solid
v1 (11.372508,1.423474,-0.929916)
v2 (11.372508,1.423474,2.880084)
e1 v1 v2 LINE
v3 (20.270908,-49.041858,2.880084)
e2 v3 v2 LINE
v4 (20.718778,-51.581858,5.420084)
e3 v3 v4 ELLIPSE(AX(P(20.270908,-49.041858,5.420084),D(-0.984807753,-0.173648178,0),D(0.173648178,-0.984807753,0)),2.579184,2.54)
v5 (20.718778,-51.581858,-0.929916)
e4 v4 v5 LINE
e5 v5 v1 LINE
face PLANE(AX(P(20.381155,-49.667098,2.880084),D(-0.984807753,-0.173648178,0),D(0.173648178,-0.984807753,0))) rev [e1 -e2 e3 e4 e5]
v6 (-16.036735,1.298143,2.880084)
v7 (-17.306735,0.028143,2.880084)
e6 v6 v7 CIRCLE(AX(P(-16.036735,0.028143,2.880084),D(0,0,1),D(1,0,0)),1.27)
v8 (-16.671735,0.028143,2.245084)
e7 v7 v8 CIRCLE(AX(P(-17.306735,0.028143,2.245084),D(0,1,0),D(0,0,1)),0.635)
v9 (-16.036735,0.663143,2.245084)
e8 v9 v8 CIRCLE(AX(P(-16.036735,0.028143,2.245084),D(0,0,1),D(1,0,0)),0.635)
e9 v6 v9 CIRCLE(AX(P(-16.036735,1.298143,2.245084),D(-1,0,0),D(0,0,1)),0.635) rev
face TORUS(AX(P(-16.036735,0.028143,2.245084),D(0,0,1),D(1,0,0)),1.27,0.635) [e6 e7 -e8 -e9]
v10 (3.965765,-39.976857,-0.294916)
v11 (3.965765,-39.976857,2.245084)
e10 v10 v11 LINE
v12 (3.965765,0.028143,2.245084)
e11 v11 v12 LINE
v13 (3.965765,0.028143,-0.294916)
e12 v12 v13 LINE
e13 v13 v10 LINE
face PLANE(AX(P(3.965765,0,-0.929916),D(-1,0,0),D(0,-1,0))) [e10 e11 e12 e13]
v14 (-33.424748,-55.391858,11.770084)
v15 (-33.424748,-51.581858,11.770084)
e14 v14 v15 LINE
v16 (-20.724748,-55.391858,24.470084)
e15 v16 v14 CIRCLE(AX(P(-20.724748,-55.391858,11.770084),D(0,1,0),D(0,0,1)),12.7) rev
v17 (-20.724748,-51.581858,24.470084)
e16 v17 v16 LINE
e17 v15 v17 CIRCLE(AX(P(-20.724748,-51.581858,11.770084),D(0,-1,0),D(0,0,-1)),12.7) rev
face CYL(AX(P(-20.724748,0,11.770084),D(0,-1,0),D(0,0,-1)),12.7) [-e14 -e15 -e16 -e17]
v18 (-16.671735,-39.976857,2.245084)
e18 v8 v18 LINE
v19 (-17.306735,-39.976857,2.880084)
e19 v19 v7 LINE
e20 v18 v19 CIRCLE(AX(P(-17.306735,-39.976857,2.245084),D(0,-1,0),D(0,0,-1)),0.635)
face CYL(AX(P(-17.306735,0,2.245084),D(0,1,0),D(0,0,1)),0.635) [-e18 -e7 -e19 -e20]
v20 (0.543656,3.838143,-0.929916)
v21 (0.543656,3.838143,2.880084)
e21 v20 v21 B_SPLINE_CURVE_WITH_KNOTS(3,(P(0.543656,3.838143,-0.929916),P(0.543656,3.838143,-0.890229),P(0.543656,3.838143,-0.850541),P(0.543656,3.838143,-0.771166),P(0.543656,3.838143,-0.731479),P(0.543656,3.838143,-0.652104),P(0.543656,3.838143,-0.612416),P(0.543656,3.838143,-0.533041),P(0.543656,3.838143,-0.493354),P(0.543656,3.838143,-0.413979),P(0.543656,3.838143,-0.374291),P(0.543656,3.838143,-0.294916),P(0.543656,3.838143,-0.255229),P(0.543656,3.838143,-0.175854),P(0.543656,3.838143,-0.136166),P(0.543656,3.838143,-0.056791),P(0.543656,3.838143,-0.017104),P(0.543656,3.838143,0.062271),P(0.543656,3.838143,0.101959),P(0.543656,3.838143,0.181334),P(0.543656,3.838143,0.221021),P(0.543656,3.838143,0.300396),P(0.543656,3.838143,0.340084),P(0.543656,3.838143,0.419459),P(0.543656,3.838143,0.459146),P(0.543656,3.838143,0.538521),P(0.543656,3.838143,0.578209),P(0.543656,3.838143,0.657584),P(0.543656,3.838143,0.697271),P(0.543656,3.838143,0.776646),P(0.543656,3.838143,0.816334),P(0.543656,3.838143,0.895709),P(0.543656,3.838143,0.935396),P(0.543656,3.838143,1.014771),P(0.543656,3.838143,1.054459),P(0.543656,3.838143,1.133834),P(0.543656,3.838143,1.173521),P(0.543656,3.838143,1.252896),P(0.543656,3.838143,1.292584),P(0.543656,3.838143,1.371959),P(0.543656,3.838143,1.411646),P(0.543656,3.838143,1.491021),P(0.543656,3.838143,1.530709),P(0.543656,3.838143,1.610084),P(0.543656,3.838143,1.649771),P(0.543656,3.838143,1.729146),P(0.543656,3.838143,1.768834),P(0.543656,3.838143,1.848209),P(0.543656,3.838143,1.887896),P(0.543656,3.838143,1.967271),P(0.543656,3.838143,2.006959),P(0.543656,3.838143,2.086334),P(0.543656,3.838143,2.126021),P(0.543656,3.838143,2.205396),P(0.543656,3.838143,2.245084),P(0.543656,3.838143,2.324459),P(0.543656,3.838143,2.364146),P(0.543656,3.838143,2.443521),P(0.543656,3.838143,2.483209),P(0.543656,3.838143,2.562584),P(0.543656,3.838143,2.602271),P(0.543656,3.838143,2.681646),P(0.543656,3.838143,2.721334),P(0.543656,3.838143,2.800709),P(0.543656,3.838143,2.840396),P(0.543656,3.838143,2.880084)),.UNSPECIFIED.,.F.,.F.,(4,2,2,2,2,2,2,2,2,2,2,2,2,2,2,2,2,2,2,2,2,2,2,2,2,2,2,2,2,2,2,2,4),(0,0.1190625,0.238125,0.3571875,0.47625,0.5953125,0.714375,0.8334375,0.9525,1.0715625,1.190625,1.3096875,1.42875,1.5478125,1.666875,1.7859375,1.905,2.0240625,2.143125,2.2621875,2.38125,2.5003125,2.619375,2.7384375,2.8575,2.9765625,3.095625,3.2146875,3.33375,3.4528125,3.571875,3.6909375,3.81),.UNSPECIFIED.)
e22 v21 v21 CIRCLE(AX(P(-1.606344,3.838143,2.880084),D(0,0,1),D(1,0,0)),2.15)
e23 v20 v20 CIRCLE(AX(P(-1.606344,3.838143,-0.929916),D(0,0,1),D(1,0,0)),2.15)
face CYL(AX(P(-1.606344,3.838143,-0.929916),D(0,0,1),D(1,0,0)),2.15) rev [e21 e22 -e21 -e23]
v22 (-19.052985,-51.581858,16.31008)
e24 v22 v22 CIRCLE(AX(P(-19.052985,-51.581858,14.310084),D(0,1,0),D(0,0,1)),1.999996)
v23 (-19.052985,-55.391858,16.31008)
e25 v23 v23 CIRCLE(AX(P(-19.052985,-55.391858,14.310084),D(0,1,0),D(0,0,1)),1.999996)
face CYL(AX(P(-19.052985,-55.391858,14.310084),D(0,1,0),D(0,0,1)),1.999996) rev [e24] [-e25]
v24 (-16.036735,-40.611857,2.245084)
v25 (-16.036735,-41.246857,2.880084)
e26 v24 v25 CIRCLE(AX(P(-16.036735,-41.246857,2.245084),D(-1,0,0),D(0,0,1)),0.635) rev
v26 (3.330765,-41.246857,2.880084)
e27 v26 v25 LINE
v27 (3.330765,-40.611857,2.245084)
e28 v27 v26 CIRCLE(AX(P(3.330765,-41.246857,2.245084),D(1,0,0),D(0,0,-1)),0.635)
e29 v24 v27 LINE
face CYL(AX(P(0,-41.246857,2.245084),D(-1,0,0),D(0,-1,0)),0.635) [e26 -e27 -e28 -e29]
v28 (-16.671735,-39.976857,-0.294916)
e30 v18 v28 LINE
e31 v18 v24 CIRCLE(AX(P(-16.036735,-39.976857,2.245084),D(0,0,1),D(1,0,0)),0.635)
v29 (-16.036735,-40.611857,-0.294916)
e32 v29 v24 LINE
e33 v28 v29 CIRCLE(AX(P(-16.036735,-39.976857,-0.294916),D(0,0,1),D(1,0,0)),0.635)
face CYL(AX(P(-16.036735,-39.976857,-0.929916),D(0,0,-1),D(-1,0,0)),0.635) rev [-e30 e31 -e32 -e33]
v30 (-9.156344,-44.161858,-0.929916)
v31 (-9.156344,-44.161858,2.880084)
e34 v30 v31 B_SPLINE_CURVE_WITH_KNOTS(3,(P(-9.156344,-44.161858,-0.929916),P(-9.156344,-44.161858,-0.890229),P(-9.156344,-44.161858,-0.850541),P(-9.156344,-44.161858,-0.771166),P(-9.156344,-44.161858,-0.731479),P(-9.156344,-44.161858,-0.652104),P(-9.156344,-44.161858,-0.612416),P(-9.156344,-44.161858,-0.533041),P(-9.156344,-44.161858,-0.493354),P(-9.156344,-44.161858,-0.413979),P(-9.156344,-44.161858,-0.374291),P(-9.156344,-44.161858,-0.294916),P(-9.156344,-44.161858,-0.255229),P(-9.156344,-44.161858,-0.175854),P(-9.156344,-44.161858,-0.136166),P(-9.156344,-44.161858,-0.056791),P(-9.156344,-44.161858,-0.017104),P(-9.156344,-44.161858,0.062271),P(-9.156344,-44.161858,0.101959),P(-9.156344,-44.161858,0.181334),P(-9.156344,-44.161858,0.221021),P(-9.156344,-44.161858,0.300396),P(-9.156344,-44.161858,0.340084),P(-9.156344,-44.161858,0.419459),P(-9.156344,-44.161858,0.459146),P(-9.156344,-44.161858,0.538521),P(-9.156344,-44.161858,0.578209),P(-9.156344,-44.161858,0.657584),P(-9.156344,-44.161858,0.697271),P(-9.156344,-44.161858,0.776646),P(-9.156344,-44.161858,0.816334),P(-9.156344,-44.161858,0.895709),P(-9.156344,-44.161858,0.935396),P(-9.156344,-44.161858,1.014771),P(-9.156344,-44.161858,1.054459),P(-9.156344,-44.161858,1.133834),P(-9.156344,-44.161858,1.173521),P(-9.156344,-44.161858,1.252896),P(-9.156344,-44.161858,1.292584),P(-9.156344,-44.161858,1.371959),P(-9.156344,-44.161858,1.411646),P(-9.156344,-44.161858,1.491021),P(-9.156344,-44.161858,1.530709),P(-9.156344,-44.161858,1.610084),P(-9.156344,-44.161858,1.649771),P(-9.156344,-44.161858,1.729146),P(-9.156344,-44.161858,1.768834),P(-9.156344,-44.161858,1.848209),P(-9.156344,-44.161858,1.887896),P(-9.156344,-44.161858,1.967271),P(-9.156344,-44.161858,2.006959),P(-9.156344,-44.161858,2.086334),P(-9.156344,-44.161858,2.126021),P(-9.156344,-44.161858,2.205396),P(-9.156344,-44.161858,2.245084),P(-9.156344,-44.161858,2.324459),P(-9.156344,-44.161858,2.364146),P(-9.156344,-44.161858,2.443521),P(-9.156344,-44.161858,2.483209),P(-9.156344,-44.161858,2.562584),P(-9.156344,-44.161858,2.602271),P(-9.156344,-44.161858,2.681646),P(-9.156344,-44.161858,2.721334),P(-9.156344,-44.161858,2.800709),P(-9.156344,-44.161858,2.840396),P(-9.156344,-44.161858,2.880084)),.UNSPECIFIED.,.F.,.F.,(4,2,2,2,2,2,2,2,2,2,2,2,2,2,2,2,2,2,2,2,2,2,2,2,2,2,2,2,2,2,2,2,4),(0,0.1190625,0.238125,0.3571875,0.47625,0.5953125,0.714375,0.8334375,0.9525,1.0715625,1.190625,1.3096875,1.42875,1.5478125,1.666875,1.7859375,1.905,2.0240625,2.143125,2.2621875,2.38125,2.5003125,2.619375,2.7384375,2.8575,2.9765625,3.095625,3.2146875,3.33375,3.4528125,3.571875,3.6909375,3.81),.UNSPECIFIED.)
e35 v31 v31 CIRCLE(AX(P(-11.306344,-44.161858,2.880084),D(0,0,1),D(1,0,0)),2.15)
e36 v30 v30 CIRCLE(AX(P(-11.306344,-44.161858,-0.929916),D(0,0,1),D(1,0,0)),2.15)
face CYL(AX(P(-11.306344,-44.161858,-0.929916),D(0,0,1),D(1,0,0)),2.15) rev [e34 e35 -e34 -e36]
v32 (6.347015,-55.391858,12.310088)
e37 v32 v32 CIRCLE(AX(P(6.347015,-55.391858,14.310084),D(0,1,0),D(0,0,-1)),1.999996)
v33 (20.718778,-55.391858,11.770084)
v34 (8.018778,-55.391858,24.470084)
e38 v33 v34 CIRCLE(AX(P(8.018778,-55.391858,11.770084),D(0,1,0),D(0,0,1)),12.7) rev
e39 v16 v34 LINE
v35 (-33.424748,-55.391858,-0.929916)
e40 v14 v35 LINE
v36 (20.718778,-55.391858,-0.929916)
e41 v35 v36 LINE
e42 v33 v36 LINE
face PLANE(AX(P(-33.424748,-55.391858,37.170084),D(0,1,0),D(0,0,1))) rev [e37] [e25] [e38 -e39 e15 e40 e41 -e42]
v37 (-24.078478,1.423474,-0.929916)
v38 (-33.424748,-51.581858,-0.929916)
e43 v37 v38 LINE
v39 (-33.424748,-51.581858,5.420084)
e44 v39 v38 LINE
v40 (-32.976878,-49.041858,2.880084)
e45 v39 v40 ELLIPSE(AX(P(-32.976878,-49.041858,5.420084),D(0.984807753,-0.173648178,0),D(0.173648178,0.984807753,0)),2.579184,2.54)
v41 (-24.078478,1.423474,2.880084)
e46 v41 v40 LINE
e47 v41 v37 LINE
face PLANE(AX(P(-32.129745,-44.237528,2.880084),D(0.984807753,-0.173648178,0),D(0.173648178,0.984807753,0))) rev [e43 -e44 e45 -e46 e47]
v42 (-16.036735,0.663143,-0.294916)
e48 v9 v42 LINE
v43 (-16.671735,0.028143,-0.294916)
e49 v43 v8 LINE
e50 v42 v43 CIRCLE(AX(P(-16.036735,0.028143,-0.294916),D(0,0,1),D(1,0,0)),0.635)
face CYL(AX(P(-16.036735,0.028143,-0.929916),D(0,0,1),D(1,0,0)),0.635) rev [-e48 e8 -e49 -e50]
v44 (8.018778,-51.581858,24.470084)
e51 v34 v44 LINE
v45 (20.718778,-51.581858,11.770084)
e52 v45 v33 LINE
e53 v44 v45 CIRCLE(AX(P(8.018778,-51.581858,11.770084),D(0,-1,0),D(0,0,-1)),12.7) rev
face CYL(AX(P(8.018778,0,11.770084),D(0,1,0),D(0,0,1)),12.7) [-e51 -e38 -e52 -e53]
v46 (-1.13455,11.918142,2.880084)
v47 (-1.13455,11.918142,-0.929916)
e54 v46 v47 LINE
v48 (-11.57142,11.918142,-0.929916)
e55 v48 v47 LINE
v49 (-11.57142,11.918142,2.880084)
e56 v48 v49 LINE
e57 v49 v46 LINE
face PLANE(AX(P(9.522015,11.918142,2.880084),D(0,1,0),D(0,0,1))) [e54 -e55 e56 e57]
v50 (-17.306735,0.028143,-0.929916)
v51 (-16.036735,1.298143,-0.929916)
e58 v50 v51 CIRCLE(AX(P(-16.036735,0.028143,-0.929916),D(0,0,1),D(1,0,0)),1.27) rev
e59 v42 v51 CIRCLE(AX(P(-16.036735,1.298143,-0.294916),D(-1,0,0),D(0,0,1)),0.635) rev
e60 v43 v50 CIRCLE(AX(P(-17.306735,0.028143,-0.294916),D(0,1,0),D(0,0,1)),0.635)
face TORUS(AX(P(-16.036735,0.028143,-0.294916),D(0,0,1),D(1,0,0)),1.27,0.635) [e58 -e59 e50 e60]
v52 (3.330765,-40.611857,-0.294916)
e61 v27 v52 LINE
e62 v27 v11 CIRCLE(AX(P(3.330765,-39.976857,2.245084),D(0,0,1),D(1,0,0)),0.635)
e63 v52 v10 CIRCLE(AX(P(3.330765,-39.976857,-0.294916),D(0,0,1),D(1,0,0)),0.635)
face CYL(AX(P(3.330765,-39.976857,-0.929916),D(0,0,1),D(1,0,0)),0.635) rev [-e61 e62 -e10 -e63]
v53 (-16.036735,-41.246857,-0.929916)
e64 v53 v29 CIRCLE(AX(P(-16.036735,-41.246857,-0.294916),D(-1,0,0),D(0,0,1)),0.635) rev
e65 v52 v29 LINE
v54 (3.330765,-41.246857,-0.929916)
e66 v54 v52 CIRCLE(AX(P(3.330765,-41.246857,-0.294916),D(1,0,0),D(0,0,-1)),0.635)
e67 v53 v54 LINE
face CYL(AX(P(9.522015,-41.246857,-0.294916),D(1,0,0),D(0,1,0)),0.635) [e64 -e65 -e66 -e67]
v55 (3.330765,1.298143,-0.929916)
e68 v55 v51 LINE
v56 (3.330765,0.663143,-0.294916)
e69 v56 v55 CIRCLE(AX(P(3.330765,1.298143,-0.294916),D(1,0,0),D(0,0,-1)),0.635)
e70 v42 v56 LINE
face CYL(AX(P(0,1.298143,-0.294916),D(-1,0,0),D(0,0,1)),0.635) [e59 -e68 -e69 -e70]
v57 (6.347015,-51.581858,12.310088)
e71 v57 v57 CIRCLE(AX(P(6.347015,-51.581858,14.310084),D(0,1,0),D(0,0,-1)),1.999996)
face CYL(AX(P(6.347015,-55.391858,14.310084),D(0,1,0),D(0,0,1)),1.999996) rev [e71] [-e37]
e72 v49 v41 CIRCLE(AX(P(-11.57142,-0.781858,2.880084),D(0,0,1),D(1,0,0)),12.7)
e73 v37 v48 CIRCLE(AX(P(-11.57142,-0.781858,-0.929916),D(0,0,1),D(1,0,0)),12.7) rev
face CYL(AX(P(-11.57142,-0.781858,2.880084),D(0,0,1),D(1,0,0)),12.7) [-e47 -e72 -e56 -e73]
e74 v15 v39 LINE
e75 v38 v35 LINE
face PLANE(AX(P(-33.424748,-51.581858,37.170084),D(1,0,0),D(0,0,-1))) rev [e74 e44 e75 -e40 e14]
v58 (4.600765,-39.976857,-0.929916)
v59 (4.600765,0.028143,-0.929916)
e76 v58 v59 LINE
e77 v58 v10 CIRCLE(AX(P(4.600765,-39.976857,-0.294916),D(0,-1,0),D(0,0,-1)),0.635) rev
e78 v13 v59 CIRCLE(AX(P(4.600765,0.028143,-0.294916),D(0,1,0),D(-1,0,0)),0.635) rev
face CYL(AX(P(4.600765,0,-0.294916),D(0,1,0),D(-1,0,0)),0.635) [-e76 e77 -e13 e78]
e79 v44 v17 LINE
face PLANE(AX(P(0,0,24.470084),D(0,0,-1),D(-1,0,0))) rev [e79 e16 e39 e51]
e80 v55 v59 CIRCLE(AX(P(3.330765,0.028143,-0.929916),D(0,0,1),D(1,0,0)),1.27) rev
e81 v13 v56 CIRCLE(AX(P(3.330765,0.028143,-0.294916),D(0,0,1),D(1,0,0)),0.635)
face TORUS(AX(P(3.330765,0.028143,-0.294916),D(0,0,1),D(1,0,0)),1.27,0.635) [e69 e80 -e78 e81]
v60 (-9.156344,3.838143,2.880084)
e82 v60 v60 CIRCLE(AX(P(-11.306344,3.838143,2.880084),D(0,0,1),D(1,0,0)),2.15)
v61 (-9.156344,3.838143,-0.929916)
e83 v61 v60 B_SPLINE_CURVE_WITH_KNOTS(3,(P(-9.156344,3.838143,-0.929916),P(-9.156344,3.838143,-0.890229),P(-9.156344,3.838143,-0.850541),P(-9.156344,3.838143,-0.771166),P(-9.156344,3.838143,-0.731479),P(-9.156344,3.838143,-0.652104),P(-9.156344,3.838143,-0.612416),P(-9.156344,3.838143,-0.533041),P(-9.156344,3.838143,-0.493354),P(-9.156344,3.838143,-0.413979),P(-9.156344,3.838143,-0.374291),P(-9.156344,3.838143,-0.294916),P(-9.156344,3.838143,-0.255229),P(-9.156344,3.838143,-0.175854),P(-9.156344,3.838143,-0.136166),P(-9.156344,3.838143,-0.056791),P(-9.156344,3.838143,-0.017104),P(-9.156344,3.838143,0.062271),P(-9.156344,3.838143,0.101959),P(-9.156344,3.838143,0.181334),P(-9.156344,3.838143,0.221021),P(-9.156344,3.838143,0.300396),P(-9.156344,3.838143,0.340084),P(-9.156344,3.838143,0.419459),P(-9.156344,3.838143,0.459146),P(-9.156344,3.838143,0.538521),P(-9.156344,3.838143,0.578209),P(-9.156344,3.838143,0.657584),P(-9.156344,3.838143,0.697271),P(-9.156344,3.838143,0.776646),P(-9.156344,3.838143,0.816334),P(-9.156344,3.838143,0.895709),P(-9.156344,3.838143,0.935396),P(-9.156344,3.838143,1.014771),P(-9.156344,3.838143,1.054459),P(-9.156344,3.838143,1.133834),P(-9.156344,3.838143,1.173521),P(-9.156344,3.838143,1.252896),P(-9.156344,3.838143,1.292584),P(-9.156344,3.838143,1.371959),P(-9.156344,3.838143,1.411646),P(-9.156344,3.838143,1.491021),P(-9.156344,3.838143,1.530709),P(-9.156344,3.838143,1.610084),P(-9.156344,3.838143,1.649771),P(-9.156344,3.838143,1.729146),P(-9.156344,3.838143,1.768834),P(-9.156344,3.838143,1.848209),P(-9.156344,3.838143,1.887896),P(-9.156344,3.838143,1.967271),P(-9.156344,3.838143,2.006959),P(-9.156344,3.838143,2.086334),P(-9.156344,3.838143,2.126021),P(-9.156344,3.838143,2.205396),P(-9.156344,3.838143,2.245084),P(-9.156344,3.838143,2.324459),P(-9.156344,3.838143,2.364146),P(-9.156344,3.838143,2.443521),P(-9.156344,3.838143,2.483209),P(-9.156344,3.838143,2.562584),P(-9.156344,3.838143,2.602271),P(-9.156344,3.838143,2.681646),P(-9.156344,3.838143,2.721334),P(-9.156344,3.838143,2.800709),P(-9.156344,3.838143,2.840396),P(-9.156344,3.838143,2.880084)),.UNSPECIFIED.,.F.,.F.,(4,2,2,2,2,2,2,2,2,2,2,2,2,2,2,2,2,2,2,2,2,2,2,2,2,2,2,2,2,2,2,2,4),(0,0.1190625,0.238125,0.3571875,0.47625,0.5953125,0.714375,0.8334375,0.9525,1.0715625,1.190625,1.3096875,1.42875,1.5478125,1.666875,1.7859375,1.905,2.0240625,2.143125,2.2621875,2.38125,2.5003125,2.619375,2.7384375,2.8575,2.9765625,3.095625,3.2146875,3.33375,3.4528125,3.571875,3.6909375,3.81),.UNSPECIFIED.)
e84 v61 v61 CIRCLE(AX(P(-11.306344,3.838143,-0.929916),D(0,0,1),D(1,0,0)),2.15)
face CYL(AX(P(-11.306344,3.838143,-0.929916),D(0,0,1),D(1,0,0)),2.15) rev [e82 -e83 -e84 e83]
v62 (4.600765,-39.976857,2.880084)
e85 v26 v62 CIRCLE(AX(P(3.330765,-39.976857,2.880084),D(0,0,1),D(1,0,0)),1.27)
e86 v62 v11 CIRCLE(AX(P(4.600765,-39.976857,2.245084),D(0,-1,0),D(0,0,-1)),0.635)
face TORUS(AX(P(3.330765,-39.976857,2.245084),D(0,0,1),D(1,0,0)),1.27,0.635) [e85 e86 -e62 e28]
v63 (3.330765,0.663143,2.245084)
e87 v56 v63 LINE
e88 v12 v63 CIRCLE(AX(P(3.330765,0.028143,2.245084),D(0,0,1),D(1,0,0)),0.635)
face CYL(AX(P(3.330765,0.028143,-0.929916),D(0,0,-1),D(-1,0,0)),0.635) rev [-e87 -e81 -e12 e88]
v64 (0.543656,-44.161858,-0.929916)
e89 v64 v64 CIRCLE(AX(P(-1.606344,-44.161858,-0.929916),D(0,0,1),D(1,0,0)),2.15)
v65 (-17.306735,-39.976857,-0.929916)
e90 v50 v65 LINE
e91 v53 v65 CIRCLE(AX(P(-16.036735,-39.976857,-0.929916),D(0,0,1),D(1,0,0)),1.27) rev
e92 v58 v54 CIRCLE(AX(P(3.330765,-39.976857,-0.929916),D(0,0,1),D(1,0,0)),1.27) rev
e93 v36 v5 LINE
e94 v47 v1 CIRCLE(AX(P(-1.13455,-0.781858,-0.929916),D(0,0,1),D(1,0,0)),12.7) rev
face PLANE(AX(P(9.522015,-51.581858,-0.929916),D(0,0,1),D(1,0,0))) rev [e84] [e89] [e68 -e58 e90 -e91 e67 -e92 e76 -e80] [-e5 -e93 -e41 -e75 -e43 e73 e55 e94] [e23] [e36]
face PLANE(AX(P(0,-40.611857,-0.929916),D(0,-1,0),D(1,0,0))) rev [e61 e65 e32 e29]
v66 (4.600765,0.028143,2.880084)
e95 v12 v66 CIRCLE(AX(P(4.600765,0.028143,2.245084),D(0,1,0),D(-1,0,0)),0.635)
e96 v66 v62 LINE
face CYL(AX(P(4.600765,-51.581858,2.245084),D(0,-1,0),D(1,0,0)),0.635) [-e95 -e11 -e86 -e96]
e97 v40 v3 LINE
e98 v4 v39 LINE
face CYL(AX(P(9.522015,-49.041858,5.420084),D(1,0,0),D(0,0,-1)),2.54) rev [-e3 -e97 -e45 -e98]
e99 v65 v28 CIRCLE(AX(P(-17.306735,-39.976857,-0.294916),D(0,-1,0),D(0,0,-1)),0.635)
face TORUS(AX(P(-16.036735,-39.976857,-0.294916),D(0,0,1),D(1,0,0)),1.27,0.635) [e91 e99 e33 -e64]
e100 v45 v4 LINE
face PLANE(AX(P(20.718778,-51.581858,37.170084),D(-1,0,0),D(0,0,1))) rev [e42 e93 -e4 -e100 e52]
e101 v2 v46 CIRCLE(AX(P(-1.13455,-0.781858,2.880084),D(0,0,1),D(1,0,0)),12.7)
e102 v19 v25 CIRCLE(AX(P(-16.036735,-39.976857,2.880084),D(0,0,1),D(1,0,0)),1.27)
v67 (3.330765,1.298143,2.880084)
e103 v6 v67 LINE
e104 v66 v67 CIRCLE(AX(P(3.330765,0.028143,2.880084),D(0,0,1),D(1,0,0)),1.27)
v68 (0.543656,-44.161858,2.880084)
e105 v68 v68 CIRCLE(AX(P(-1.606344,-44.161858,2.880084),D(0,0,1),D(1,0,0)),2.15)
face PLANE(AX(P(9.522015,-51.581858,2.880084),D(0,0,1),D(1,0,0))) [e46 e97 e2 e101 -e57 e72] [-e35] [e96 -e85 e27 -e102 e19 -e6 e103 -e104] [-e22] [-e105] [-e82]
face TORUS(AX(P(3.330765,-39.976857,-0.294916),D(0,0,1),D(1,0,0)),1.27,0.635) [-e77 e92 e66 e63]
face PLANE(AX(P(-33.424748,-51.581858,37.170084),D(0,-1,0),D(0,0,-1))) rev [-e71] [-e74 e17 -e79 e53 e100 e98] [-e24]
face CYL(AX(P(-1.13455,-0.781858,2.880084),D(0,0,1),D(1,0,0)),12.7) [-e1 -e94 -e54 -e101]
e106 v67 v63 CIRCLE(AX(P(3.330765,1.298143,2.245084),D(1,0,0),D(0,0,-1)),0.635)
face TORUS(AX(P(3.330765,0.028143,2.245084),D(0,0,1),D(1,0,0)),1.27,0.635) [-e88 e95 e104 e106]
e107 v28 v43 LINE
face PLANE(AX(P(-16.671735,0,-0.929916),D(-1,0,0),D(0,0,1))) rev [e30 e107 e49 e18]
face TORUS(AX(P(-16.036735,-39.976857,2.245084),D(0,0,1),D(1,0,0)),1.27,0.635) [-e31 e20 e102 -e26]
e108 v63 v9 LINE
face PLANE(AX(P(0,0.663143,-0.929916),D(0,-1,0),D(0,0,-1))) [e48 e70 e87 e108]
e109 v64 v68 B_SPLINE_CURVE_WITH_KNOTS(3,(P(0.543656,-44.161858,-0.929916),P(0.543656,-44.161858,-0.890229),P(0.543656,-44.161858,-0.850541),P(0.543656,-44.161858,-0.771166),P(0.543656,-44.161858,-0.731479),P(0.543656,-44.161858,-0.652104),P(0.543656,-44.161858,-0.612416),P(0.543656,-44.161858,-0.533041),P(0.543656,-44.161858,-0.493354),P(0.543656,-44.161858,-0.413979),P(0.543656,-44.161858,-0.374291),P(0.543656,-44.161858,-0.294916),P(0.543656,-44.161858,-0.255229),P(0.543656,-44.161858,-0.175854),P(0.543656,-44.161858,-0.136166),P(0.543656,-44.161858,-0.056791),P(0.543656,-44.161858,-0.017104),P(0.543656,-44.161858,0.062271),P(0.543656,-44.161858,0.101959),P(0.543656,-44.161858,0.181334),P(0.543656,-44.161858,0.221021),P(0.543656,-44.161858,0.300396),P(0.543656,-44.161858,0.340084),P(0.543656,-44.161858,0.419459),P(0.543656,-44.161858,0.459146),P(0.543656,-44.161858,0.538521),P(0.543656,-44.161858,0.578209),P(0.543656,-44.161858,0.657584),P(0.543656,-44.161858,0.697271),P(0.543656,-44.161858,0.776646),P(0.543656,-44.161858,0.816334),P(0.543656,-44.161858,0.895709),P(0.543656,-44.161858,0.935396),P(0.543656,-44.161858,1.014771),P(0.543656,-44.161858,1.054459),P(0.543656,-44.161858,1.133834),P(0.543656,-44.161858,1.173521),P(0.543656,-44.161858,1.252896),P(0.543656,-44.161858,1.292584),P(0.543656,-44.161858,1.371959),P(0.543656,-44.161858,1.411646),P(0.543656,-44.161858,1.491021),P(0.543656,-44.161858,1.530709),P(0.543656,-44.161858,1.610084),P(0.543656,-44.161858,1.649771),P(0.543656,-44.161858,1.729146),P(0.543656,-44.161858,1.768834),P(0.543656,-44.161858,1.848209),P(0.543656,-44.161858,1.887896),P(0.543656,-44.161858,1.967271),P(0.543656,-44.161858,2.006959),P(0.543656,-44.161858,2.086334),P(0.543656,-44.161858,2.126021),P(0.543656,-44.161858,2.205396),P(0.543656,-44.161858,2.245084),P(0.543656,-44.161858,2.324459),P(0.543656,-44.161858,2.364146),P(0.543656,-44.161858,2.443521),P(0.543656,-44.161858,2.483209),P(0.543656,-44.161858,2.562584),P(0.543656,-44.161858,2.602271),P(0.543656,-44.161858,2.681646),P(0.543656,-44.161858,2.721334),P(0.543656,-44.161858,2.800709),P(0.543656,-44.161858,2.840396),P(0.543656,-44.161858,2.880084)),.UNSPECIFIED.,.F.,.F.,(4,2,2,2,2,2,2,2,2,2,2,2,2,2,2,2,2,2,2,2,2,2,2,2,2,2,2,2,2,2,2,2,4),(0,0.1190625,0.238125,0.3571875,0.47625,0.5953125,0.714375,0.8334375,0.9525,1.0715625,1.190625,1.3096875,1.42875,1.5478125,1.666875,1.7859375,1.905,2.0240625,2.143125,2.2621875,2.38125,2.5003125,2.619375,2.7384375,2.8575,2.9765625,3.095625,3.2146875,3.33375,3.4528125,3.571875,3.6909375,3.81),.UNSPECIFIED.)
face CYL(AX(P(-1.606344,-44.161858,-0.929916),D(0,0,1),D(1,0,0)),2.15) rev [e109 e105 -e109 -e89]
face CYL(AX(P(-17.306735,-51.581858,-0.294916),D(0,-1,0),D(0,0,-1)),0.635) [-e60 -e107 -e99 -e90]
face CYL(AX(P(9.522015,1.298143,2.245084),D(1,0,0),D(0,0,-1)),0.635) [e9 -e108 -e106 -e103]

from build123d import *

# Parameters (mm, degrees)
FILLET2_START       = -0.929916211
FILLET2_OUTLINE_R   = 2.15
FILLET2_DEPTH       = 3.81
FILLET2_START_2     = 2.880083789
FILLET2_2_OUTLINE_W = 54.14352655
FILLET2_2_OUTLINE_H = 3.81
FILLET2_2_DEPTH     = 34.29
FILLET6_R           = 2.54
SKETCH6_W           = 54.14352655
SKETCH6_H           = 3.81
CUT_EXTRUDE2_DEPTH  = 12.7
FILLET8_R           = 12.7
SKETCH7_R           = 1.999996
CUT_EXTRUDE3_DEPTH  = 76.817206459
SKETCH8_W           = 20.6375
SKETCH8_H           = 41.275
CUT_EXTRUDE5_DEPTH  = 69.202637613
FILLET10_R          = 0.635


with BuildPart() as part:
    # Fillet2: read off the stored shape, not the designer's step
    # Fillet2 outline → Fillet2 (new body)
    with BuildSketch(Plane.XY.offset(FILLET2_START)):
        with BuildLine():
            Line((20.718778313, -51.581857548), (11.372508186, 1.423474309))
            ThreePointArc((11.372508186, 1.423474309), (7.028852365, 8.94690688), (-1.134550278, 11.918142452))
            Line((-1.134550278, 11.918142452), (-11.571419646, 11.918142452))
            ThreePointArc((-11.571419646, 11.918142452), (-19.734822289, 8.94690688), (-24.078478109, 1.423474309))
            Line((-24.078478109, 1.423474309), (-33.424748237, -51.581857548))
            Line((-33.424748237, -51.581857548), (-33.424748237, -55.391857548))
            Line((-33.424748237, -55.391857548), (20.718778313, -55.391857548))
            Line((20.718778313, -55.391857548), (20.718778313, -51.581857548))
        make_face()
        with Locations((-11.306344138, -44.161858203)):
            Circle(FILLET2_OUTLINE_R, mode=Mode.SUBTRACT)
        with Locations((-1.606344138, -44.161858203)):
            Circle(FILLET2_OUTLINE_R, mode=Mode.SUBTRACT)
        with Locations((-11.306344138, 3.838143108)):
            Circle(FILLET2_OUTLINE_R, mode=Mode.SUBTRACT)
        with Locations((-1.606344138, 3.838143108)):
            Circle(FILLET2_OUTLINE_R, mode=Mode.SUBTRACT)
    extrude(amount=FILLET2_DEPTH)

    # Fillet2 2 outline → Fillet2 2 (add)
    with BuildSketch(Plane.XY.offset(FILLET2_START_2)):
        with Locations((-6.352984962, -53.486857548)):
            Rectangle(FILLET2_2_OUTLINE_W, FILLET2_2_OUTLINE_H)
    extrude(amount=FILLET2_2_DEPTH)

    # Fillet6
    fillet6_edges = [part.edges().sort_by_distance(p)[0] for p in [
        (-6.352984962, -51.581857548, 2.880083789),
    ]]
    fillet(fillet6_edges, radius=FILLET6_R)

    # Sketch6 → Cut-Extrude2 (cut)
    with BuildSketch(Plane.XY.offset(37.170083789)):
        with Locations((-6.352984962, -53.486857548)):
            Rectangle(SKETCH6_W, SKETCH6_H)
    extrude(amount=-CUT_EXTRUDE2_DEPTH, mode=Mode.SUBTRACT)

    # Fillet8
    fillet8_edges = [part.edges().sort_by_distance(p)[0] for p in [
        (-33.424748237, -53.486857548, 24.470083789),
        (20.718778313, -53.486857548, 24.470083789),
    ]]
    fillet(fillet8_edges, radius=FILLET8_R)

    # Sketch7 → Cut-Extrude3 (cut, through all)
    with BuildSketch(Plane(origin=(0, -51.581857548, 0), x_dir=(1, 0, 0), z_dir=(0, 1, 0))):
        with Locations(Location((-19.052984962, -14.310083789, 0), (0, 0, 270))):
            Circle(SKETCH7_R)
        with Locations(Location((6.347015038, -14.310083789, 0), (0, 0, 90))):
            Circle(SKETCH7_R)
    extrude(amount=-CUT_EXTRUDE3_DEPTH, mode=Mode.SUBTRACT)

    # Sketch8 → Cut-Extrude5 (cut, through all)
    with BuildSketch(Plane.XY.offset(2.880083789)):
        with Locations((-6.352984962, -19.974356892)):
            Rectangle(SKETCH8_W, SKETCH8_H)
    extrude(amount=-CUT_EXTRUDE5_DEPTH, mode=Mode.SUBTRACT)

    # Fillet10
    fillet10_edges = [part.edges().sort_by_distance(p)[0] for p in [
        (3.965765038, -19.974356892, 2.880083789),
        (3.965765038, 0.663143108, 0.975083789),
        (-6.352984962, -40.611856892, -0.929916211),
        (3.965765038, -40.611856892, 0.975083789),
        (-16.671734962, -19.974356892, -0.929916211),
        (-16.671734962, -40.611856892, 0.975083789),
        (-6.352984962, 0.663143108, 2.880083789),
        (-16.671734962, 0.663143108, 0.975083789),
        (3.965765038, -19.974356892, -0.929916211),
        (-6.352984962, 0.663143108, -0.929916211),
        (-16.671734962, -19.974356892, 2.880083789),
        (-6.352984962, -40.611856892, 2.880083789),
    ]]
    fillet(fillet10_edges, radius=FILLET10_R)


solid = part.part
